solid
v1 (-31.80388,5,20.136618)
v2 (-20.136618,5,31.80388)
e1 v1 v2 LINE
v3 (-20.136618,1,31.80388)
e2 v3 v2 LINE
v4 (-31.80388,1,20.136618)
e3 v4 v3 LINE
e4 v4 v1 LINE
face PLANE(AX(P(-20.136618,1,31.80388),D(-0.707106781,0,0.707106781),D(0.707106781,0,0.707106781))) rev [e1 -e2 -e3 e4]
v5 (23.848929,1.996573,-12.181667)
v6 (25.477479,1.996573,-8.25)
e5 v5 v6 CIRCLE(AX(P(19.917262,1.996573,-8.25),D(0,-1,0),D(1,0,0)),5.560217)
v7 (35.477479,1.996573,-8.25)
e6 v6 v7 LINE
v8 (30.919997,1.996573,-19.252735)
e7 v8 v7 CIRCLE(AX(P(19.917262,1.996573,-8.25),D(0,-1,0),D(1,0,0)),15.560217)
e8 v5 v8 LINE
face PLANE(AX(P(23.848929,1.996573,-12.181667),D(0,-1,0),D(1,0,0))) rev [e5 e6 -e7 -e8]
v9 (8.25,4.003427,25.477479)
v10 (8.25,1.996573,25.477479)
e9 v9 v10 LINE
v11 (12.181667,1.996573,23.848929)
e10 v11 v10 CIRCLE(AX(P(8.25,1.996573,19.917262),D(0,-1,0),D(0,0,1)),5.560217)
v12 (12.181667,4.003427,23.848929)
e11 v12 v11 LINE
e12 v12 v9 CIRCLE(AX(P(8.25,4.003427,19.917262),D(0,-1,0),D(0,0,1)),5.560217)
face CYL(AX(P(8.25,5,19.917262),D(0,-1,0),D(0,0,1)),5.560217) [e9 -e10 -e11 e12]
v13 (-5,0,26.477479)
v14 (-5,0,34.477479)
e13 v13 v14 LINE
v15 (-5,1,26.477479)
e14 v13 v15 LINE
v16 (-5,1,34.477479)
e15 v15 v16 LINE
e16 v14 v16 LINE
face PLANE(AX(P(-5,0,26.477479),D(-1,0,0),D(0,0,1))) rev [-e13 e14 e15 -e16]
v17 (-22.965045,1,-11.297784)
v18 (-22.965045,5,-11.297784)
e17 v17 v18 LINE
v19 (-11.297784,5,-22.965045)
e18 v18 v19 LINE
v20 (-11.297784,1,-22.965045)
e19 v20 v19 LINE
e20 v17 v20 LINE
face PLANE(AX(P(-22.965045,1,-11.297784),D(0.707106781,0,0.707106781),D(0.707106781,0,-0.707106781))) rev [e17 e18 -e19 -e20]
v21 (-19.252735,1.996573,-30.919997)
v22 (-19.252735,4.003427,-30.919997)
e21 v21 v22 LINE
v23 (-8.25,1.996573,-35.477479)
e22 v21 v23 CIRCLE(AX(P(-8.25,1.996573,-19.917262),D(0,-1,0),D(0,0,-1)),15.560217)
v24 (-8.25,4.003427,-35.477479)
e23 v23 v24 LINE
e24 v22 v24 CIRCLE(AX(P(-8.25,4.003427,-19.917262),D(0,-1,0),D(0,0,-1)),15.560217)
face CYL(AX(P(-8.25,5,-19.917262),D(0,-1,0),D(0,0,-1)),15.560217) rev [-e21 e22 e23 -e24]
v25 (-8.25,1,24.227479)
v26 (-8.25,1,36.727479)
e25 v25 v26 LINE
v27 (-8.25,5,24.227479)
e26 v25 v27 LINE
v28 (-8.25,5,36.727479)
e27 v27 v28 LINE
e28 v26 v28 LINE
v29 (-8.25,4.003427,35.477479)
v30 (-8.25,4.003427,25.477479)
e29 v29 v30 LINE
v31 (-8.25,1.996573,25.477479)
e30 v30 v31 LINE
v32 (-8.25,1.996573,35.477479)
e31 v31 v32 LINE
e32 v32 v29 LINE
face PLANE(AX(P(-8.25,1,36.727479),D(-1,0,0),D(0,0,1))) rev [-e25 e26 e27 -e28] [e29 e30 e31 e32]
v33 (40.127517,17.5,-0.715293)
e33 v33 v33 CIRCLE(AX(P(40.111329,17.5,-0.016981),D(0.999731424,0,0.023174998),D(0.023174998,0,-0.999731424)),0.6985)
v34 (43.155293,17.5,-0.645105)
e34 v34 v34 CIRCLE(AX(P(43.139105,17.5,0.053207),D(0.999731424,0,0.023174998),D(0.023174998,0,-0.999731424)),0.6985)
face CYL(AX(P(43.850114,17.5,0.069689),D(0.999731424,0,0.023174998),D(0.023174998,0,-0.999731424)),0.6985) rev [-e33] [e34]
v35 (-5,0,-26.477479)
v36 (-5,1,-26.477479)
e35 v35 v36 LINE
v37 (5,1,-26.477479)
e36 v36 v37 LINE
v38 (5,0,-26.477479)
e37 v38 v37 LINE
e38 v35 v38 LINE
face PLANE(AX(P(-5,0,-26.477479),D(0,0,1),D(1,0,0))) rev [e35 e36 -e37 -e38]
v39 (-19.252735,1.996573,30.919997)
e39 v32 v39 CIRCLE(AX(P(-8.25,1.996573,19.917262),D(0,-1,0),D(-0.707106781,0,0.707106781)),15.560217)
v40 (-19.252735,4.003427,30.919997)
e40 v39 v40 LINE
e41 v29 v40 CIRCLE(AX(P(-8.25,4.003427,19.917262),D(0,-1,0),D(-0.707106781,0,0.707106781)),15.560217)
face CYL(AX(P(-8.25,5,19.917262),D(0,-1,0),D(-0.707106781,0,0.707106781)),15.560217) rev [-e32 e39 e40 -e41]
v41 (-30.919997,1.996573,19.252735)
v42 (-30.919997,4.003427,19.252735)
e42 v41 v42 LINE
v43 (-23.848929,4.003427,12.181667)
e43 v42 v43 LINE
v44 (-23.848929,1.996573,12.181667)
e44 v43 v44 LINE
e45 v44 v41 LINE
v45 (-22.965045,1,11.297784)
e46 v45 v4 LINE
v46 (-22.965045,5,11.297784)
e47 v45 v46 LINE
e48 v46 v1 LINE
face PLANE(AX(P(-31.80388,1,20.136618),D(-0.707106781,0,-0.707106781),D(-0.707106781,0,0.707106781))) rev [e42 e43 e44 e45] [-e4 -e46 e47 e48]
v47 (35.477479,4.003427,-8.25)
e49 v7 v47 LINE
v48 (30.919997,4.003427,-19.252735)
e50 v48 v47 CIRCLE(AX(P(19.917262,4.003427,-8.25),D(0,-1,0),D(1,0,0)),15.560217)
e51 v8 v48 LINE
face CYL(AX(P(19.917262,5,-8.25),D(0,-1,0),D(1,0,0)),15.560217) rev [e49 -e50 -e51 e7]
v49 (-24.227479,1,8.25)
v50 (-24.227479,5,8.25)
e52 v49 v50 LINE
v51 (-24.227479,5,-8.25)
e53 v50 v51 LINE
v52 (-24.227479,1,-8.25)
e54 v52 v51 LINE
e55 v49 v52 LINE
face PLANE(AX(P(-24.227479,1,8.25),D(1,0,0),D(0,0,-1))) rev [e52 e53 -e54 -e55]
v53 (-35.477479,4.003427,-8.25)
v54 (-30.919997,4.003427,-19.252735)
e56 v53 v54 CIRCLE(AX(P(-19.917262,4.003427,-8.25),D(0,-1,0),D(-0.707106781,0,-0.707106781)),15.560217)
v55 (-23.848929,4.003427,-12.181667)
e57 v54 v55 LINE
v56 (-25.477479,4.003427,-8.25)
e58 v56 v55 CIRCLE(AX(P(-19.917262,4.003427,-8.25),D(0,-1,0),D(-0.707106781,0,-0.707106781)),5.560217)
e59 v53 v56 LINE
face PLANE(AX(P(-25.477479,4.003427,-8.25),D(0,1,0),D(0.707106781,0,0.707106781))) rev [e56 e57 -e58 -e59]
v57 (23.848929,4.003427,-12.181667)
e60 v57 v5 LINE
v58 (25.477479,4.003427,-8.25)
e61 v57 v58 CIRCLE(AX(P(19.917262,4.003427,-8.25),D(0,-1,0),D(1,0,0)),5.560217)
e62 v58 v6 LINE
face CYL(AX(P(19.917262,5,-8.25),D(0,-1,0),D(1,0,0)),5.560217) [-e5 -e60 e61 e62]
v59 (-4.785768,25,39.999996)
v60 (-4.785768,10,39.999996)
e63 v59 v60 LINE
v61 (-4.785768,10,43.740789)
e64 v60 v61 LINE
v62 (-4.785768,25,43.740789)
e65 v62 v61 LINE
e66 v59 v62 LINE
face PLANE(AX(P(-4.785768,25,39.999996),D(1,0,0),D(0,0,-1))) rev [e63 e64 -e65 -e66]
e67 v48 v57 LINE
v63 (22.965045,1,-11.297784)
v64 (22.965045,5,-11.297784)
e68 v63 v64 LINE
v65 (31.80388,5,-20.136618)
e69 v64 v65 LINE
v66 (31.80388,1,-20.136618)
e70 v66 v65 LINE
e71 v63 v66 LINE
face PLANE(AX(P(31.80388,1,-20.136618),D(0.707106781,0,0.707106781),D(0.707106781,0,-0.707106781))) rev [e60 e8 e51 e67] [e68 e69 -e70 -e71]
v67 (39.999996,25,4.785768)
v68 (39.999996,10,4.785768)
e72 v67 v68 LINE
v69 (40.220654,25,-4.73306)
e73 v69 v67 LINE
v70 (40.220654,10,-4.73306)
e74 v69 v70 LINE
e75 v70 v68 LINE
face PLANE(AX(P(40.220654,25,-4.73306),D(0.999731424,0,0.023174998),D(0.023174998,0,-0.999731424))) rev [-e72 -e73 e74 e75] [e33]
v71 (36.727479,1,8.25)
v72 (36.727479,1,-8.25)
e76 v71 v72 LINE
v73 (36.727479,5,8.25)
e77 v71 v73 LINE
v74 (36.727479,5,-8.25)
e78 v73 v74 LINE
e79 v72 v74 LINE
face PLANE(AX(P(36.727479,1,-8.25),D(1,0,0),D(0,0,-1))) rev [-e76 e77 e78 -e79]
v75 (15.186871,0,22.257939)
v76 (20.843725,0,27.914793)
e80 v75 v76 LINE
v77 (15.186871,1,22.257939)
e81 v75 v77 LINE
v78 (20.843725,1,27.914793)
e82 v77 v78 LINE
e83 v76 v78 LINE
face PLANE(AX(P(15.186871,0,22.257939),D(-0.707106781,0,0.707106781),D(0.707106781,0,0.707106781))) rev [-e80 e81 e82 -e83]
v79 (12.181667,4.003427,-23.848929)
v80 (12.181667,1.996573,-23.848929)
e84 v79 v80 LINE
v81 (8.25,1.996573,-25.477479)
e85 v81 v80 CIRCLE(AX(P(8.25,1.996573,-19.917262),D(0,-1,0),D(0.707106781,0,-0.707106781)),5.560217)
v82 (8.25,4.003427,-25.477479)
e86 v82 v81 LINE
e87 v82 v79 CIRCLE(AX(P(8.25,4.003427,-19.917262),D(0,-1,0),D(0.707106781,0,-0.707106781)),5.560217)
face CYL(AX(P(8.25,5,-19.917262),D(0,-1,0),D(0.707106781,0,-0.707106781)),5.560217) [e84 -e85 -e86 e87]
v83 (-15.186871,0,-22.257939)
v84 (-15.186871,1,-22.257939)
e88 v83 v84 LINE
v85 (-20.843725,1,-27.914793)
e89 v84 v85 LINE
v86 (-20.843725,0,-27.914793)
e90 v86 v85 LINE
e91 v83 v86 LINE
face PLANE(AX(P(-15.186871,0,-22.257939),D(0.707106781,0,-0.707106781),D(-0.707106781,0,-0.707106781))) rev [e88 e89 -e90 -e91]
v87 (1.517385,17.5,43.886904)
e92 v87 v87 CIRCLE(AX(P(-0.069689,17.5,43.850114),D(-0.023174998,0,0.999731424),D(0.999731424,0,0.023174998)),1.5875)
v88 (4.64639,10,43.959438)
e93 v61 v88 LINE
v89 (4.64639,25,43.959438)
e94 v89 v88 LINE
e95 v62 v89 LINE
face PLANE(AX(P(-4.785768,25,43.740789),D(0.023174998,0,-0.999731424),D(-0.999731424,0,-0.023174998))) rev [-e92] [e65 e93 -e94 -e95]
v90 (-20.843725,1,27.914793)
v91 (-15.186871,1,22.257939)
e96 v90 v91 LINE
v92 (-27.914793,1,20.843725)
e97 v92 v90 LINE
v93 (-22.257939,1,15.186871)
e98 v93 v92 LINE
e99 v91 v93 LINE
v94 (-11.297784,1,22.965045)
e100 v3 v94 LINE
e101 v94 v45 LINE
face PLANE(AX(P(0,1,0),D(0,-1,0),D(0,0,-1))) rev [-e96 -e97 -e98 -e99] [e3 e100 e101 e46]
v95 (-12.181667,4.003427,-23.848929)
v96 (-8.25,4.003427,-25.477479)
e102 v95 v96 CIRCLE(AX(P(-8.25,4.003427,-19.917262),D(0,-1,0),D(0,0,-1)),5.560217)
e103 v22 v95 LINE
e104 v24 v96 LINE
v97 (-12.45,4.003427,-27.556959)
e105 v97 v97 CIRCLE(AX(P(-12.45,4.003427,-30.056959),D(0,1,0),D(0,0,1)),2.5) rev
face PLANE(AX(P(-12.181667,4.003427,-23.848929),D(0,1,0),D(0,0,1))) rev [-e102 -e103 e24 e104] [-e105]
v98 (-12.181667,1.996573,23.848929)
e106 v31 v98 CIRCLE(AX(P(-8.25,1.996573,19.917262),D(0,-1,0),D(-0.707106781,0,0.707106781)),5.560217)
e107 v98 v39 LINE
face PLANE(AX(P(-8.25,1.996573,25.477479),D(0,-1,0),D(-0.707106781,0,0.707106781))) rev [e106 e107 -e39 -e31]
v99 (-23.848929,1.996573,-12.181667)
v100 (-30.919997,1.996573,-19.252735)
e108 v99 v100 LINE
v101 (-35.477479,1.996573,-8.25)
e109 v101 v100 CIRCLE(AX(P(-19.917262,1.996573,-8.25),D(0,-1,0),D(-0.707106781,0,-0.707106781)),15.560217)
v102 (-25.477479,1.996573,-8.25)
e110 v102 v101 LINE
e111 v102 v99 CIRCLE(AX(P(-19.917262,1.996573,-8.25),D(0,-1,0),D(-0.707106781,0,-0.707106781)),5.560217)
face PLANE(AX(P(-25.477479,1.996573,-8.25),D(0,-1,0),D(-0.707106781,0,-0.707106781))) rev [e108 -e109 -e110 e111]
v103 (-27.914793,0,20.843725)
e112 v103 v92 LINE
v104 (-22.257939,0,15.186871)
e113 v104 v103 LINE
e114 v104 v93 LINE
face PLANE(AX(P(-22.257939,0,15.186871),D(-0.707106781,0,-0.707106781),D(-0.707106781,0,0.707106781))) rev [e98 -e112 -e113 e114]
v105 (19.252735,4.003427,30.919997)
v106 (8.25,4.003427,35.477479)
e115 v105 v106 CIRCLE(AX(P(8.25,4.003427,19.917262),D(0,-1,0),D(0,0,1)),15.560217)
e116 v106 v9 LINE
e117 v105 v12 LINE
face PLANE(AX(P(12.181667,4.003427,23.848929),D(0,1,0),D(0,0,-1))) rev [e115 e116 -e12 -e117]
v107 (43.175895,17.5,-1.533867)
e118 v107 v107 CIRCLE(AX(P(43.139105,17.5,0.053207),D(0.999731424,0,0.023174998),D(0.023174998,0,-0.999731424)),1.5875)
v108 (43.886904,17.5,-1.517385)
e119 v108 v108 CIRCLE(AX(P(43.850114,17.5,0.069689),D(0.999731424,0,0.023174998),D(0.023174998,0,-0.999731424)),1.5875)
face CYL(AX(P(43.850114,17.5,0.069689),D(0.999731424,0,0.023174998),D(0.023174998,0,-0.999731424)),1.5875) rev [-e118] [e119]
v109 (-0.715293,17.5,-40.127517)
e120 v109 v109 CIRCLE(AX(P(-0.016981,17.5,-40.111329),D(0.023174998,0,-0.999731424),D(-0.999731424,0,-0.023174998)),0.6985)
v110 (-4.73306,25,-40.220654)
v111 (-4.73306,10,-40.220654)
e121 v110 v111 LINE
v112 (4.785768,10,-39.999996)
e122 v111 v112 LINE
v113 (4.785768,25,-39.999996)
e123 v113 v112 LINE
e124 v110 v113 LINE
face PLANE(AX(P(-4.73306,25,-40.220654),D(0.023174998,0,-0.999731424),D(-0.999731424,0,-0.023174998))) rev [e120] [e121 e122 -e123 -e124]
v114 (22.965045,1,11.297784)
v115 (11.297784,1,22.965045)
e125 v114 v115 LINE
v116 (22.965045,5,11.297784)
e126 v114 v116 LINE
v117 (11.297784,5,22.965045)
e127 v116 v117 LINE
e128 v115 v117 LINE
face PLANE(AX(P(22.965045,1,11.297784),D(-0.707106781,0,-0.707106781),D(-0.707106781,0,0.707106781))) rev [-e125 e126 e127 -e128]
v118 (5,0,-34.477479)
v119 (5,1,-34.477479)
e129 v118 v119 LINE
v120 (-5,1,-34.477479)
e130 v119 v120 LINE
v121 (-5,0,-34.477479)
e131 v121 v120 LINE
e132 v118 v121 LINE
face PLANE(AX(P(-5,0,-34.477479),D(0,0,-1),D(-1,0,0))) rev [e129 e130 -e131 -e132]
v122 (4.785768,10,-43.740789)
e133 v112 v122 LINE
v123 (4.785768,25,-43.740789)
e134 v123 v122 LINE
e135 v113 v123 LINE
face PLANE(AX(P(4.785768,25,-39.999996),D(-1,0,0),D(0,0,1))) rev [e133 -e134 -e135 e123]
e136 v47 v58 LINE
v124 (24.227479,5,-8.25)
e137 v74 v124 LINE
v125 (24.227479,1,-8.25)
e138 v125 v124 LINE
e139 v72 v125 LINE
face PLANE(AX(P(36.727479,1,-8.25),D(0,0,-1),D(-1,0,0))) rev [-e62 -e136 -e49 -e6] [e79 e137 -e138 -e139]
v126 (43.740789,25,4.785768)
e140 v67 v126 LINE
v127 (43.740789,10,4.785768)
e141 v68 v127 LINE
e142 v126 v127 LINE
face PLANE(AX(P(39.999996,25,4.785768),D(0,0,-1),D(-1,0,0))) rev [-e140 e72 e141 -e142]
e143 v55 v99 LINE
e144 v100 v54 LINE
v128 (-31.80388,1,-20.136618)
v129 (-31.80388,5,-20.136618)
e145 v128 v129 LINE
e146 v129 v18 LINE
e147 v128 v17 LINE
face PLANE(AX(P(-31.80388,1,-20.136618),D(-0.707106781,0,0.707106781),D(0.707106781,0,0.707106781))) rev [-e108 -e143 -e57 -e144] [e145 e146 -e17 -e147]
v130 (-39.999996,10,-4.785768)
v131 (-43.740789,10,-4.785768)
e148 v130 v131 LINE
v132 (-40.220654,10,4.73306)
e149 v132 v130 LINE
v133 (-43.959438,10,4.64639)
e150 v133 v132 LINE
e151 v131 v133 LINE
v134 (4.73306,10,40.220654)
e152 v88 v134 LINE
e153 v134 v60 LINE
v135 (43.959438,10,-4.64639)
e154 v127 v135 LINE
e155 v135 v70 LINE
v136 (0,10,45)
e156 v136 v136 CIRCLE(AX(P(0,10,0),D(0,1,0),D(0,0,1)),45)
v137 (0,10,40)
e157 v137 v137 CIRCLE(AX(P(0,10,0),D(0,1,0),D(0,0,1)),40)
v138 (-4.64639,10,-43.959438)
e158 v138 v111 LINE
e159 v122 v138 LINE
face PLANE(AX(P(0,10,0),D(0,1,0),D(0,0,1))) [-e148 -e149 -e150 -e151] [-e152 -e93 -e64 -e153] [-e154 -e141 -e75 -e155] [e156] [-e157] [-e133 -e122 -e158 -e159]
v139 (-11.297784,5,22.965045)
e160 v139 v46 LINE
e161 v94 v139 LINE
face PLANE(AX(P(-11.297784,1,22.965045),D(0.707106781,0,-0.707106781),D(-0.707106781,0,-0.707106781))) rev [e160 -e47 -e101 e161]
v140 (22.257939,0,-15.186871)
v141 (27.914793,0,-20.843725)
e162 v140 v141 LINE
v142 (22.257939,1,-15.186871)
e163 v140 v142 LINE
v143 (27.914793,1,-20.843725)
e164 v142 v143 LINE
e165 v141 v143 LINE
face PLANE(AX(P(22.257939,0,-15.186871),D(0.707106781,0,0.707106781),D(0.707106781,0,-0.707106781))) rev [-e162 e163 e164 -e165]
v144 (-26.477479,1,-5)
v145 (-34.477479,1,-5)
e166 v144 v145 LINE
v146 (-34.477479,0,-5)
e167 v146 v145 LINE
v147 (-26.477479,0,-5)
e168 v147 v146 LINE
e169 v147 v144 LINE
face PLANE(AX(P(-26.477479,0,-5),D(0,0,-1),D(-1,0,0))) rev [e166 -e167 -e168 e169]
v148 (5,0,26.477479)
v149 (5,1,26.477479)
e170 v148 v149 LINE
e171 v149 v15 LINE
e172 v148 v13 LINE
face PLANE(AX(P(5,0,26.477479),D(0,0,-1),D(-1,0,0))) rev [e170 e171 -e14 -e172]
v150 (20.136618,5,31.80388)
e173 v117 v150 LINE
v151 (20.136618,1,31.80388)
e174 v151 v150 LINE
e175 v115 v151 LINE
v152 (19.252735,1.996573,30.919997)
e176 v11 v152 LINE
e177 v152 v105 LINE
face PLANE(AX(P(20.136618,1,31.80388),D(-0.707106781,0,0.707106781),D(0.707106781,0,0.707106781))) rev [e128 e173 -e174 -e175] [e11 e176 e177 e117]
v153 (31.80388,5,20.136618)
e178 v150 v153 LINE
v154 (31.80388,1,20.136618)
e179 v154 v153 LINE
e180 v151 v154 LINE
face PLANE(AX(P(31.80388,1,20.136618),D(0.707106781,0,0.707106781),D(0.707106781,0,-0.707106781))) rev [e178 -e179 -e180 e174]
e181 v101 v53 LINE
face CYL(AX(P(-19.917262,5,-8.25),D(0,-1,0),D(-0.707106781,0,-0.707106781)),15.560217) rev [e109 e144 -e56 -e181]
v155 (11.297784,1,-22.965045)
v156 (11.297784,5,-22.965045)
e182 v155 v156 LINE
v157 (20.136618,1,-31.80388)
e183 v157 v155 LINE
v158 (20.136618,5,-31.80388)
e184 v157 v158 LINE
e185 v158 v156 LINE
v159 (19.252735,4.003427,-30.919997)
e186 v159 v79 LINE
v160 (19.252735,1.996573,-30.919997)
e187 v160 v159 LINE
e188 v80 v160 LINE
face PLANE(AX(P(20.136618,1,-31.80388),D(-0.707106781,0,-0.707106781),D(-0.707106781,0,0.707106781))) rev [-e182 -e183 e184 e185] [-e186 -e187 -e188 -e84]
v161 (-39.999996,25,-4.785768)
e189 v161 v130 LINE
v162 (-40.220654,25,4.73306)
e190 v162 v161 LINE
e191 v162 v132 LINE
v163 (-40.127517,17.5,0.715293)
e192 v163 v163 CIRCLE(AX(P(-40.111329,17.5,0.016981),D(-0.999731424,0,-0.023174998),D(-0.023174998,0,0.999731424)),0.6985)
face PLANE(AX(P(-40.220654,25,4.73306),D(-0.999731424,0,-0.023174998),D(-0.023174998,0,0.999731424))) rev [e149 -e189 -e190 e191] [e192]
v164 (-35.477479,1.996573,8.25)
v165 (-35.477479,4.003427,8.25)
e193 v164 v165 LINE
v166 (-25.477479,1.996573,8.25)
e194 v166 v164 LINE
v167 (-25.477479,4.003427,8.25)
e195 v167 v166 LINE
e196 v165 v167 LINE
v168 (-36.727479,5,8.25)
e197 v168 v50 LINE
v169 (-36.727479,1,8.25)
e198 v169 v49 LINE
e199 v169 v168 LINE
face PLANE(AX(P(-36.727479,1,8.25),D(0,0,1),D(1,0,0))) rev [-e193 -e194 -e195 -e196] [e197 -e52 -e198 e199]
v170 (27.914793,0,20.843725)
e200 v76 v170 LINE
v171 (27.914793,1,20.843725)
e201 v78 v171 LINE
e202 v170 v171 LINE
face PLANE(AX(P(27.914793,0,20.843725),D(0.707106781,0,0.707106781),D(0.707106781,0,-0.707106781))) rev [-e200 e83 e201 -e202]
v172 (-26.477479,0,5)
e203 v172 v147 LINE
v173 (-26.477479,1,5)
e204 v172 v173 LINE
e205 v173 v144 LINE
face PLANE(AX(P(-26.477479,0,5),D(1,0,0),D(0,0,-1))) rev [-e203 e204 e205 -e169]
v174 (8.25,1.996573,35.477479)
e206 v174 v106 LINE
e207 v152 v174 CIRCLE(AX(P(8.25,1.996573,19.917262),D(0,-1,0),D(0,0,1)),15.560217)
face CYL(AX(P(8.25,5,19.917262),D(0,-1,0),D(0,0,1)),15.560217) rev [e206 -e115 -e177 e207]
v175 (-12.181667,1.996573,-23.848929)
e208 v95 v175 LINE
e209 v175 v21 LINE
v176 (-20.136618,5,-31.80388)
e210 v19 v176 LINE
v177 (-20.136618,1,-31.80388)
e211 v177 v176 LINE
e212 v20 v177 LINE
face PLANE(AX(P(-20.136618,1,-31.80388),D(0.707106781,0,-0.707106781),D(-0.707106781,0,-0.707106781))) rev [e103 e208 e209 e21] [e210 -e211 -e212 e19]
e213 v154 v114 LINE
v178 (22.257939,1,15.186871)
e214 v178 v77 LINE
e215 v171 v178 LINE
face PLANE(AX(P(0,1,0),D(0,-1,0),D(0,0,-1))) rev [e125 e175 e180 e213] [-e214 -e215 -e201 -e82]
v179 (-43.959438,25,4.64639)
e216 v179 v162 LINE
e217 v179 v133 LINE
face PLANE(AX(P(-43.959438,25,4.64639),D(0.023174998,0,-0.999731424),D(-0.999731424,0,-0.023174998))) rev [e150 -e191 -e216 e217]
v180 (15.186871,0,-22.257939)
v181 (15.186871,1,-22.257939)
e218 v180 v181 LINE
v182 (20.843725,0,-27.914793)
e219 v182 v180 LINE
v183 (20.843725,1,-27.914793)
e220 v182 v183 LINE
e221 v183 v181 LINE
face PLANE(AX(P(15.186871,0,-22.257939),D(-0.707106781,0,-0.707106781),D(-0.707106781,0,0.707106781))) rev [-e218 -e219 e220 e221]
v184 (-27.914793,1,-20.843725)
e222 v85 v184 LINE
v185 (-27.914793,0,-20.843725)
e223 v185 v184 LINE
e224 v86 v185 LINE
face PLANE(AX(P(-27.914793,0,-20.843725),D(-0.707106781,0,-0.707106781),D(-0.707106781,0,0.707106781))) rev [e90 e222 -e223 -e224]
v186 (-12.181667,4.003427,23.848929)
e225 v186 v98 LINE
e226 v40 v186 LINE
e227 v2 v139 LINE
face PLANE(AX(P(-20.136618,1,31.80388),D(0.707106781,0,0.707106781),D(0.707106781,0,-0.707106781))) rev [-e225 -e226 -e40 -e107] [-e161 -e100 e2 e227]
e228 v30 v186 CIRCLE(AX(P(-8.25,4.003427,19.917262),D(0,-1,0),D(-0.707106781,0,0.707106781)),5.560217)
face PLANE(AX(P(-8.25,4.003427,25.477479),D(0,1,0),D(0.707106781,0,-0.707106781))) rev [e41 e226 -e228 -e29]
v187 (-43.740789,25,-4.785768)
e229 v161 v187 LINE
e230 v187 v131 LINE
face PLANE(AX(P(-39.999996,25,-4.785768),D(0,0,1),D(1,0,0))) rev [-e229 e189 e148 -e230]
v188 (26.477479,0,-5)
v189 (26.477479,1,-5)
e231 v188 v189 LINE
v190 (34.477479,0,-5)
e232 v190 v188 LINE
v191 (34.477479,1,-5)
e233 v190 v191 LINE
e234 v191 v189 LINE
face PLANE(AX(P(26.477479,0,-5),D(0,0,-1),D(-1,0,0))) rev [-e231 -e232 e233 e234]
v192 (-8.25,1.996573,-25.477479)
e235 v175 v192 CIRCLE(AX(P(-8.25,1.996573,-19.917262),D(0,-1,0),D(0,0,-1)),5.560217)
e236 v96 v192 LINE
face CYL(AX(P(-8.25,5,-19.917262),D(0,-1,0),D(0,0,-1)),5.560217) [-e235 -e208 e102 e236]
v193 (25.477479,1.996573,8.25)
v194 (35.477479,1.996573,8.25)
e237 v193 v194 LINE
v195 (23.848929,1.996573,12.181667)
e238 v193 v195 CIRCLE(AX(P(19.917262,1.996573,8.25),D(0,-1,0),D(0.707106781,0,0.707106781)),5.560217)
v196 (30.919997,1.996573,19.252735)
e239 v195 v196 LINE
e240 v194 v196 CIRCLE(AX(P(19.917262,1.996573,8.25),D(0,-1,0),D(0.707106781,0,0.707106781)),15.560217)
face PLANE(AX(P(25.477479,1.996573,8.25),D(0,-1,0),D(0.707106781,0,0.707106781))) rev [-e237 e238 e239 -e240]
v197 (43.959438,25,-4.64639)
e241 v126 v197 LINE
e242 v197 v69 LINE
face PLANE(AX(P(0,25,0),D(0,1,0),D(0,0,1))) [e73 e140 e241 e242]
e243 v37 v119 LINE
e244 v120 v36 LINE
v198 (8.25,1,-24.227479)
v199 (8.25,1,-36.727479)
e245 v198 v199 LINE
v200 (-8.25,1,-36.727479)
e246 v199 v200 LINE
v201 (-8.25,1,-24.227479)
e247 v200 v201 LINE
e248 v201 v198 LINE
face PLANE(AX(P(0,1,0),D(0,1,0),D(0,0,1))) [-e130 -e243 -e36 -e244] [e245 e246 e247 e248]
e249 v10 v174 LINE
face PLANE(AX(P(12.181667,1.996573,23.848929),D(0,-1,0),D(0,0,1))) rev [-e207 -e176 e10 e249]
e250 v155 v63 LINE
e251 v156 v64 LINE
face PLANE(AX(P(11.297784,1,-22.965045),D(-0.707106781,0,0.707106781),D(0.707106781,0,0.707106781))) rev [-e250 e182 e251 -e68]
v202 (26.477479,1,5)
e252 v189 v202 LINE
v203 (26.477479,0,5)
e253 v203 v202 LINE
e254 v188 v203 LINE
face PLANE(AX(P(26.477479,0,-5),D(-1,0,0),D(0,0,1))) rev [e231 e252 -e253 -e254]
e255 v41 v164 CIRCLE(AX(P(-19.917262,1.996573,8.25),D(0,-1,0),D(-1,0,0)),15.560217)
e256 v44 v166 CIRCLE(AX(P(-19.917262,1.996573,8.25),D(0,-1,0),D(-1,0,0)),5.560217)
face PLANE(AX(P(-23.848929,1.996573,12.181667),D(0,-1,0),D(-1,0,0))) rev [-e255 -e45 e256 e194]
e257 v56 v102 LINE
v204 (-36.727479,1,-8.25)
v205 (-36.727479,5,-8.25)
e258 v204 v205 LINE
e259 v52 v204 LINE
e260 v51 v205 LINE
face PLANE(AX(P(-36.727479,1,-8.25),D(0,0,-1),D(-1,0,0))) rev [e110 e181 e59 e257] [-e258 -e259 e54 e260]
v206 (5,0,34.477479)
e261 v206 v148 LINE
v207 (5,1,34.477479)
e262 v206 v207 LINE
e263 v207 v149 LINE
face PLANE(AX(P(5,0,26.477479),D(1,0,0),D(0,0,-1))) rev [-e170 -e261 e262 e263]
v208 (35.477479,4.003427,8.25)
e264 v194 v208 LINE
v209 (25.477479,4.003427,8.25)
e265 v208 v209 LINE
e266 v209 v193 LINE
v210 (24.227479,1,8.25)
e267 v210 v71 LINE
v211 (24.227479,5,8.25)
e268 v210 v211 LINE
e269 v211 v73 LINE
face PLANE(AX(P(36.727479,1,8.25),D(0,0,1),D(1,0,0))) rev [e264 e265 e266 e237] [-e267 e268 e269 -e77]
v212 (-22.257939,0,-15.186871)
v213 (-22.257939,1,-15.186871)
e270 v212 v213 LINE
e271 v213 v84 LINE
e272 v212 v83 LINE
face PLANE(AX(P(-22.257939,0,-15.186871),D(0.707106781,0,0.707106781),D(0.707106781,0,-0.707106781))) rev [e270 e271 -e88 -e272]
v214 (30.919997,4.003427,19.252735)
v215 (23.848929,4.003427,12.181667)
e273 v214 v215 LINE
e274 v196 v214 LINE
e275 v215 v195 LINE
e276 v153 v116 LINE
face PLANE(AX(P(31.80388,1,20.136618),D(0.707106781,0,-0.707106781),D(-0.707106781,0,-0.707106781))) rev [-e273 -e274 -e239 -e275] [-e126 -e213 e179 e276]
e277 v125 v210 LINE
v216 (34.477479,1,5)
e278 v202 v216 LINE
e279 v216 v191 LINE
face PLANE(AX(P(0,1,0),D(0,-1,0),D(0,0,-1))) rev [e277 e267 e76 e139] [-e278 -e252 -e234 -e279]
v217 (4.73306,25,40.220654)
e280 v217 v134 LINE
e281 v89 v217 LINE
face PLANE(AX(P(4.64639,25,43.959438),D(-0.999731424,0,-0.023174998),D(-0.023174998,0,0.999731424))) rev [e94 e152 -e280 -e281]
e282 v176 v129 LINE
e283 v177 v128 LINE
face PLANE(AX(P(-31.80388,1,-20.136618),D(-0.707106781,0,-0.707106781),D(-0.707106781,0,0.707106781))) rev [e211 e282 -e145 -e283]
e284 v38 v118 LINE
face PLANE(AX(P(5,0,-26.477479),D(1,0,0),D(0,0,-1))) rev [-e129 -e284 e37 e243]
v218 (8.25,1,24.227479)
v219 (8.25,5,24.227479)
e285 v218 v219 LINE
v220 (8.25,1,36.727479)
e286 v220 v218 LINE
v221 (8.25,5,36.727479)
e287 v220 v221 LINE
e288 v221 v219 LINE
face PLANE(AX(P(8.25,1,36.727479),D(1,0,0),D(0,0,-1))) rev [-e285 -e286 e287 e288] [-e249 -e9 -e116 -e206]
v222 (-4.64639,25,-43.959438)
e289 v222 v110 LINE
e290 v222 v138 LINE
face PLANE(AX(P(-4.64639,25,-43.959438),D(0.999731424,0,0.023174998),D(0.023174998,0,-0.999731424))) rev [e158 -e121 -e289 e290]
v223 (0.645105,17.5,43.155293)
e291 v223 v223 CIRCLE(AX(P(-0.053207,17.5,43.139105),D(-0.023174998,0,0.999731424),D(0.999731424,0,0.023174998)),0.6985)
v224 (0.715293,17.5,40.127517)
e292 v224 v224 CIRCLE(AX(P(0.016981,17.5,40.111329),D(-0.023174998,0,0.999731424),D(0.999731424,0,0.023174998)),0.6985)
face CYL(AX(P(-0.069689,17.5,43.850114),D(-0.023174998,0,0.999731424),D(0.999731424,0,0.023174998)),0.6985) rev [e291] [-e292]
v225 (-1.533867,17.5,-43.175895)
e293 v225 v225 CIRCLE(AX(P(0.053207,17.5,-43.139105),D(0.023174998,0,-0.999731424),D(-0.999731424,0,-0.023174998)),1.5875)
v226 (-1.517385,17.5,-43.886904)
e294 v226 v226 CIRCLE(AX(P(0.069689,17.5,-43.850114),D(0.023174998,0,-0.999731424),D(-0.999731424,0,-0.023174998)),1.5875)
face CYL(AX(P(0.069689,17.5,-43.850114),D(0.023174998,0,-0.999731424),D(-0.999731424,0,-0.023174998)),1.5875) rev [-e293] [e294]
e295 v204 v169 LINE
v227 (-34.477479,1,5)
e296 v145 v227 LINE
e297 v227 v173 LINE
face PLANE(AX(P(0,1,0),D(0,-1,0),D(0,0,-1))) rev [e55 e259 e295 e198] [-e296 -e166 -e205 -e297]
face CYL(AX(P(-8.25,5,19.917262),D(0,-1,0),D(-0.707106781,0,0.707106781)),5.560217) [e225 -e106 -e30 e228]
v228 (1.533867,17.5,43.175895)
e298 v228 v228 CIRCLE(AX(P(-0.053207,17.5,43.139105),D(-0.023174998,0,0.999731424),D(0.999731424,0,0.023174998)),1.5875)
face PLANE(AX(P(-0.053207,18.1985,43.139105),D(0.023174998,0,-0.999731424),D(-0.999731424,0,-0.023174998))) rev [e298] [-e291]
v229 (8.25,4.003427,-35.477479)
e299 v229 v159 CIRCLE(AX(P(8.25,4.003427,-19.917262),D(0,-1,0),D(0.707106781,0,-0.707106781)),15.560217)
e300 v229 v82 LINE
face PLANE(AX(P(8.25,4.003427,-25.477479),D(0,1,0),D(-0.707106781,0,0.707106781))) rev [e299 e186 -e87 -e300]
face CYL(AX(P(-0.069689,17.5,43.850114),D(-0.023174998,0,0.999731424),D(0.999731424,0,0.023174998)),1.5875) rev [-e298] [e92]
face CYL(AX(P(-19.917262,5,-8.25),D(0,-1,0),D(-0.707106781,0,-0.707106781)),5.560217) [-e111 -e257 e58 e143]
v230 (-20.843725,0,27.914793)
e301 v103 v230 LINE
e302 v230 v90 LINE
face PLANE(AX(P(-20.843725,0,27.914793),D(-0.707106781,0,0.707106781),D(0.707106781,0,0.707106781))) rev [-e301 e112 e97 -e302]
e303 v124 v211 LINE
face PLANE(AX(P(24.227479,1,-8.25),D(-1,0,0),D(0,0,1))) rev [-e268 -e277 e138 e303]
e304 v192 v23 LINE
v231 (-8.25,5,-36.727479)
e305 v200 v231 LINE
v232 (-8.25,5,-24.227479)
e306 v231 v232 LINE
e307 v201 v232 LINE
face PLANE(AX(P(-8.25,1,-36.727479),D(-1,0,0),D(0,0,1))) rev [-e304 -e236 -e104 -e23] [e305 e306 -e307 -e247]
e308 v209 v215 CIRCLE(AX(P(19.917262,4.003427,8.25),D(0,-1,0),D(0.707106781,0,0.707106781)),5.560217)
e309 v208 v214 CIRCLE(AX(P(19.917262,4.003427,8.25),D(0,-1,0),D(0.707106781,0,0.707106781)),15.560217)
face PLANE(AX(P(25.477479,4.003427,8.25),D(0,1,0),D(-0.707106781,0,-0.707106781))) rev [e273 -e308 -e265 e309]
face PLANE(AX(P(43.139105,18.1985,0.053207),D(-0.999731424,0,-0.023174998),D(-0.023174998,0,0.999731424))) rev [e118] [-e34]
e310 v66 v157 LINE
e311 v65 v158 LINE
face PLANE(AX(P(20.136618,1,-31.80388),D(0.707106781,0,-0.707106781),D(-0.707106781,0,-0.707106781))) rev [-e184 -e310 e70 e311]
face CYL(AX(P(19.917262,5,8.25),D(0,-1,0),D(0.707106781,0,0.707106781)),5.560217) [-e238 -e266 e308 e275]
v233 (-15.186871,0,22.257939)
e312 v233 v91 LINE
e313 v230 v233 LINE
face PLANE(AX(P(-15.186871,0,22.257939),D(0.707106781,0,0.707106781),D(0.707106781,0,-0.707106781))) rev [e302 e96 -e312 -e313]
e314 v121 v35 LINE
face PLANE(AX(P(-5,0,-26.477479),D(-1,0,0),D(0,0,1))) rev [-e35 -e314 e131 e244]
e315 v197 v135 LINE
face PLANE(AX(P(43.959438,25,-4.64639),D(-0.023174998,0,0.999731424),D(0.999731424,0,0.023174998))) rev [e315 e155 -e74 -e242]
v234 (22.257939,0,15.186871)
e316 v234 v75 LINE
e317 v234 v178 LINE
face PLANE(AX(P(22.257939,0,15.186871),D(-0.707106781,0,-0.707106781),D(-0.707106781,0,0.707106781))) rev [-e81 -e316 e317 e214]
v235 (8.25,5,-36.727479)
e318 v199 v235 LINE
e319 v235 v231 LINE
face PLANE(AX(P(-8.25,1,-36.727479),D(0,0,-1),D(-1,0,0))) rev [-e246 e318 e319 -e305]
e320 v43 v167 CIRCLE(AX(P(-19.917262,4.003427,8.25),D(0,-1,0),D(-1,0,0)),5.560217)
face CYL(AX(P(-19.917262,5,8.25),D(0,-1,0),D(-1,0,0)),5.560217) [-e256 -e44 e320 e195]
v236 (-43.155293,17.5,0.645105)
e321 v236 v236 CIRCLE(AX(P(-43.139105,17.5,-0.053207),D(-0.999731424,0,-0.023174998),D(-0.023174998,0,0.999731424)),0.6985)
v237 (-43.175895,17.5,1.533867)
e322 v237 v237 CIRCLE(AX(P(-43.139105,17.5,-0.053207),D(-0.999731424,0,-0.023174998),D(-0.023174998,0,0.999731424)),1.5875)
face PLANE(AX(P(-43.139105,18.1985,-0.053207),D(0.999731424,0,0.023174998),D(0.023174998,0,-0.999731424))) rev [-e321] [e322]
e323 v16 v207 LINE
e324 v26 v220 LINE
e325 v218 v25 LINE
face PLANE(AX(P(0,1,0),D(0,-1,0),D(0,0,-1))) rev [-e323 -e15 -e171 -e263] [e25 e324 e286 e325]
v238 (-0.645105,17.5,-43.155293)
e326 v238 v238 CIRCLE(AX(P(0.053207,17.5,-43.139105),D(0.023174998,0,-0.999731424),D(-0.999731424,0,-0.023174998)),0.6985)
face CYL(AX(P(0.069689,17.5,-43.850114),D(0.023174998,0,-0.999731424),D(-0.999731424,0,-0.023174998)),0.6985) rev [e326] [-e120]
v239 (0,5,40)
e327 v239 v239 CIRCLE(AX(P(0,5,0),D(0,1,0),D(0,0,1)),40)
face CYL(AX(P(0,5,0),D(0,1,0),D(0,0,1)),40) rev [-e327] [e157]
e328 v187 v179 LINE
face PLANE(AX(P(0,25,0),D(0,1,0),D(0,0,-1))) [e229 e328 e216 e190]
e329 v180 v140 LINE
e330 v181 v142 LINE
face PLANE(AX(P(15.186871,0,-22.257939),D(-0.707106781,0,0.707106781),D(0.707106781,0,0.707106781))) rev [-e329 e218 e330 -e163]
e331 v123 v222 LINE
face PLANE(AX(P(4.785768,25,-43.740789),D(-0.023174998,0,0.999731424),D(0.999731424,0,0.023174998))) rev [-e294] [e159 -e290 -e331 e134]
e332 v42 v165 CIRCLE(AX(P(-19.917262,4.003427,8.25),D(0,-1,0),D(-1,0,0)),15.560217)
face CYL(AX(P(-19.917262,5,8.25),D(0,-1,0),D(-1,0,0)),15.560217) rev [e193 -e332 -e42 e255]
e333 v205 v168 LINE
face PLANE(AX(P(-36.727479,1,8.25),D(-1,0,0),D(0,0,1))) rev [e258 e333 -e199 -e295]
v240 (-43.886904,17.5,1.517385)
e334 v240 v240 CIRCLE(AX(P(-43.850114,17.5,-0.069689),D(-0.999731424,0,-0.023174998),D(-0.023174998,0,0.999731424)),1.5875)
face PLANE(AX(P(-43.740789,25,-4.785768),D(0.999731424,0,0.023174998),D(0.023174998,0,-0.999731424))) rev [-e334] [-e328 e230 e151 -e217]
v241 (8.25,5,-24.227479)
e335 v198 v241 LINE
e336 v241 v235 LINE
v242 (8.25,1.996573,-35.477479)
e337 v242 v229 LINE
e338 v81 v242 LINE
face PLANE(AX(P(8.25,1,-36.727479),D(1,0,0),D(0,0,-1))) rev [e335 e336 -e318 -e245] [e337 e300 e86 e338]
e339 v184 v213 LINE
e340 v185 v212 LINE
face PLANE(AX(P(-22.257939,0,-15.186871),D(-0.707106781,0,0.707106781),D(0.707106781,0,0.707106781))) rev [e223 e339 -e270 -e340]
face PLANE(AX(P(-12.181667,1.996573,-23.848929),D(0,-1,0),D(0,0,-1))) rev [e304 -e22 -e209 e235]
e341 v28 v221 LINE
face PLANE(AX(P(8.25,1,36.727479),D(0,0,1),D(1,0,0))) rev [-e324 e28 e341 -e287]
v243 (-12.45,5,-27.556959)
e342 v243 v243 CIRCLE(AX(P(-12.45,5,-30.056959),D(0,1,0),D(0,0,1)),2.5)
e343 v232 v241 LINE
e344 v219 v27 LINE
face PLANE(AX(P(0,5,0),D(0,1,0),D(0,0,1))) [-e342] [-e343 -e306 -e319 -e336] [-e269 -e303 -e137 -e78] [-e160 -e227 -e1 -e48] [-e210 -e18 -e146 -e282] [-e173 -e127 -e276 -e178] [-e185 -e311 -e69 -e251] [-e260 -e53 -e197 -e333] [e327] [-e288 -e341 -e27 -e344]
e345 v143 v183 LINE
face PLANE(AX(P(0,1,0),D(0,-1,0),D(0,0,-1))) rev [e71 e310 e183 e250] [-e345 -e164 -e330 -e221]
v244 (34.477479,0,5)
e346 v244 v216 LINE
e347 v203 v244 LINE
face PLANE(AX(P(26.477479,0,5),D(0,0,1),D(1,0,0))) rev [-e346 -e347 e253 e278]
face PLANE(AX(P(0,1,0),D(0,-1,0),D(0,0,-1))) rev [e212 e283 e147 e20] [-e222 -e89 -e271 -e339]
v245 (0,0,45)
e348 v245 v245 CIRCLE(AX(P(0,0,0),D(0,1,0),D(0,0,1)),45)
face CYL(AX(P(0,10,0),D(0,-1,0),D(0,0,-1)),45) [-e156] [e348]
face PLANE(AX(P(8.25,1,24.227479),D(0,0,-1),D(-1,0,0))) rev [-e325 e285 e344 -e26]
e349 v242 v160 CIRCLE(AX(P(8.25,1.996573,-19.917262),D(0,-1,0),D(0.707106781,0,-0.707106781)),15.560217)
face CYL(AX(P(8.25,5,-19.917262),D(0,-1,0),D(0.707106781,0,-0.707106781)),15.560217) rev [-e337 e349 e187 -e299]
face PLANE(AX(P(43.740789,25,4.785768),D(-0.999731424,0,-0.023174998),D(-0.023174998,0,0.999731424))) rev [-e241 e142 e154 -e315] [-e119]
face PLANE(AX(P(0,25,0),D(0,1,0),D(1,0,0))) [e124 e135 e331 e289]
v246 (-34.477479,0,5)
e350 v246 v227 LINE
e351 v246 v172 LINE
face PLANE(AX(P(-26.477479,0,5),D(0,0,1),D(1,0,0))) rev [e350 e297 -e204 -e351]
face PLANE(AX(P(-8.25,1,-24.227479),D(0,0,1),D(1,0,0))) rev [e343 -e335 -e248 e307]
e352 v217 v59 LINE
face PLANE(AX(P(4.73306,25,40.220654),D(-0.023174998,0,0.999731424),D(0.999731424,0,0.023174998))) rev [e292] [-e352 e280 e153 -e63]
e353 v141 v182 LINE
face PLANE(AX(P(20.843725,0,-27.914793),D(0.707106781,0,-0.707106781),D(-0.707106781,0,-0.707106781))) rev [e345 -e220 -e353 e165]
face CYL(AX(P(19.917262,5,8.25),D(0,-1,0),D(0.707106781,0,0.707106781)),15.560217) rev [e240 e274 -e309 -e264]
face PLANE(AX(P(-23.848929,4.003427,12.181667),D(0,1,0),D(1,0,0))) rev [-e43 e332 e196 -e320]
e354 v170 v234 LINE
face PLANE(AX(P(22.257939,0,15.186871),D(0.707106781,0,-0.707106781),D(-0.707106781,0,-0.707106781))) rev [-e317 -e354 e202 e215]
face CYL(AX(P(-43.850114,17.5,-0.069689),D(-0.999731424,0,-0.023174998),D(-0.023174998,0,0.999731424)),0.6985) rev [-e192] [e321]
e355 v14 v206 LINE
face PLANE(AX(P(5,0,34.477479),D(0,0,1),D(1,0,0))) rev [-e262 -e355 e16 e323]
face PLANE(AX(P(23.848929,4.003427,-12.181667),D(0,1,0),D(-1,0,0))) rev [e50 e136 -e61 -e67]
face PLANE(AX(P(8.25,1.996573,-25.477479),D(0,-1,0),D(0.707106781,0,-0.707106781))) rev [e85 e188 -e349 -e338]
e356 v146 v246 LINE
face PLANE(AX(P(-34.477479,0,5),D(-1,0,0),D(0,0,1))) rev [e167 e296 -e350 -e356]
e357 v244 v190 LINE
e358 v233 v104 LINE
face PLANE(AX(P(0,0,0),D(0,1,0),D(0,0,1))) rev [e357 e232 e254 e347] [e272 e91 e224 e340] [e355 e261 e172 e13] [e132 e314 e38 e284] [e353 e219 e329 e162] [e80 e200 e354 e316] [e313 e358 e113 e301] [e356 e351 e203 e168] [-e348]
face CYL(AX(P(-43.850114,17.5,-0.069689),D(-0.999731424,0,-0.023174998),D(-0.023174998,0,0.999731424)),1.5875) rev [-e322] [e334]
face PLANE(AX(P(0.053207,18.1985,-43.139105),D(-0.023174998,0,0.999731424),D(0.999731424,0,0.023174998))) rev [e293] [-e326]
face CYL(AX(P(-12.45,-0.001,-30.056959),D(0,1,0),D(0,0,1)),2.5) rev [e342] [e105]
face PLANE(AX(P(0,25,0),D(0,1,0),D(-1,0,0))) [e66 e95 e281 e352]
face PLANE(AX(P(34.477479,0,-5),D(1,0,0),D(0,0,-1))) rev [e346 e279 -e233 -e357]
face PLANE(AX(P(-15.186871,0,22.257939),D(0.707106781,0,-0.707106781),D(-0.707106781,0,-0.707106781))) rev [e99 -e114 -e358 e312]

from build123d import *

# Parameters (mm, degrees)
SKETCH2_R                                     = 45
BOSS_EXTRUDE1_DEPTH                           = 10
SKETCH3_R                                     = 40
CUT_EXTRUDE1_DEPTH                            = 5
SKETCH4_W                                     = 16.5
SKETCH4_H                                     = 12.5
SKETCH4_W_2                                   = 12.5
SKETCH4_H_2                                   = 16.5
CUT_EXTRUDE2_DEPTH                            = 4
SKETCH6_W                                     = 10
SKETCH6_H                                     = 8
CUT_EXTRUDE3_DEPTH                            = 65.272855857
CIRPATTERN1_COUNT                             = 8
SKETCH7_W                                     = 10
SKETCH7_H                                     = 2.006854622
CUT_REVOLVE1_ANGLE                            = 45
CIRPATTERN8_COUNT                             = 8
CUT_EXTRUDE4_REACH                            = 65.836
SKETCH10_R                                    = 2.5
BOSS_EXTRUDE2_DEPTH                           = 15
CIRPATTERN9_COUNT                             = 4
CBORE_START                                   = 40.100162841
CBORE_FOR_00_BINDING_HEAD_MACHINE_S_2_R       = 0.6985
CBORE_FOR_00_BINDING_HEAD_MACHINE_SCREW_DEPTH = 3.739789051
CBORE_START_2                                 = 43.128751892
CBORE_FOR_00_BINDING_HEAD_MACHINE_S_3_O_R     = 1.5875
CBORE_FOR_00_BINDING_HEAD_MACHINE_S_3_O_R_2   = 0.6985
CBORE_FOR_00_BINDING_HEAD_MACHINE_S_3_DEPTH   = 0.7112
CIRPATTERN10_COUNT                            = 4


# Read off the part's stored shape, not the designer's step: CBORE for #00 Binding Head Machine Screw3
with BuildPart() as part:
    # Sketch2 → Boss-Extrude1 (new body)
    with BuildSketch(Plane(origin=(0, 0, 0), x_dir=(1, 0, 0), z_dir=(0, 1, 0))):
        with Locations(Location((0, 0, 0), (0, 0, 270))):
            Circle(SKETCH2_R)
    extrude(amount=BOSS_EXTRUDE1_DEPTH)

    # Sketch3 → Cut-Extrude1 (cut)
    with BuildSketch(Plane(origin=(0, 10, 0), x_dir=(1, 0, 0), z_dir=(0, 1, 0))):
        with Locations(Location((0, 0, 0), (0, 0, 270))):
            Circle(SKETCH3_R)
    extrude(amount=-CUT_EXTRUDE1_DEPTH, mode=Mode.SUBTRACT)

    # Sketch4 → Cut-Extrude2 (cut)
    with BuildSketch(Plane(origin=(0, 5, 0), x_dir=(1, 0, 0), z_dir=(0, 1, 0))):
        with Locations((0, 30.477478673)):
            Rectangle(SKETCH4_W, SKETCH4_H)
        Polygon((20.136618281, 31.80388017), (11.297783516, 22.965045405), (22.965045405, 11.297783516), (31.80388017, 20.136618281), align=None)
        with Locations((30.477478673, 0)):
            Rectangle(SKETCH4_W_2, SKETCH4_H_2)
        Polygon((31.80388017, -20.136618281), (22.965045405, -11.297783516), (11.297783516, -22.965045405), (20.136618281, -31.80388017), align=None)
        with Locations((0, -30.477478673)):
            Rectangle(SKETCH4_W, SKETCH4_H)
        Polygon((-20.136618281, -31.80388017), (-11.297783516, -22.965045405), (-22.965045405, -11.297783516), (-31.80388017, -20.136618281), align=None)
        with Locations((-30.477478673, 0)):
            Rectangle(SKETCH4_W_2, SKETCH4_H_2)
        Polygon((-31.80388017, 20.136618281), (-22.965045405, 11.297783516), (-11.297783516, 22.965045405), (-20.136618281, 31.80388017), align=None)
    extrude(amount=-CUT_EXTRUDE2_DEPTH, mode=Mode.SUBTRACT)

    # Sketch6 → Cut-Extrude3 (cut, through all)
    with BuildSketch(Plane(origin=(0, 1, 0), x_dir=(1, 0, 0), z_dir=(0, 1, 0))):
        with Locations((0, 30.477478673)):
            Rectangle(SKETCH6_W, SKETCH6_H)
    cut_extrude3 = extrude(amount=-CUT_EXTRUDE3_DEPTH, mode=Mode.SUBTRACT)

    # CirPattern1: Cut-Extrude3 ×8 about axis
    cirpattern1_axis = Axis((0, 0, 0), (0, 1, 0))
    for i in range(1, CIRPATTERN1_COUNT):
        add(cut_extrude3.rotate(cirpattern1_axis, i * 360 / CIRPATTERN1_COUNT), mode=Mode.SUBTRACT)

    # Sketch7 → Cut-Revolve1 (revolve, cut)
    with BuildSketch(Plane(origin=(-8.25, 0, 0), x_dir=(0, 0, -1), z_dir=(1, 0, 0))):
        with Locations((30.477478673, 3)):
            Rectangle(SKETCH7_W, SKETCH7_H)
    cut_revolve1 = revolve(axis=Axis((-8.25, 5, -19.91726189), (0, 1, 0)), revolution_arc=CUT_REVOLVE1_ANGLE, mode=Mode.SUBTRACT)

    # CirPattern8: Cut-Revolve1 ×8 about axis
    cirpattern8_axis = Axis((0, 0, 0), (0, 1, 0))
    for i in range(1, CIRPATTERN8_COUNT):
        add(cut_revolve1.rotate(cirpattern8_axis, i * 360 / CIRPATTERN8_COUNT), mode=Mode.SUBTRACT)

    # Sketch10 → Cut-Extrude4 (cut, up to next)
    with BuildSketch(Plane(origin=(0, 5, 0), x_dir=(1, 0, 0), z_dir=(0, 1, 0)), mode=Mode.PRIVATE) as cut_extrude4_sk1:
        with Locations(Location((-12.45, 30.056958852, 0), (0, 0, 270))):
            Circle(SKETCH10_R)
    cut_extrude4_tool1 = extrude(cut_extrude4_sk1.sketch, amount=-CUT_EXTRUDE4_REACH, mode=Mode.PRIVATE) & part.part
    add(cut_extrude4_tool1.solids().sort_by_distance((-12.45, 5, -30.056959))[0], mode=Mode.SUBTRACT)

    # Sketch11 → Boss-Extrude2 (add)
    with BuildSketch(Plane(origin=(0, 10, 0), x_dir=(1, 0, 0), z_dir=(0, 1, 0))):
        Polygon((40.22065381, 4.733059783), (39.999995725, -4.78576812), (43.740789465, -4.78576812), (43.959438442, 4.646390178), align=None)
    boss_extrude2 = extrude(amount=BOSS_EXTRUDE2_DEPTH)

    # CirPattern9: Boss-Extrude2 ×4 about axis
    cirpattern9_axis = Axis((0, 0, 0), (0, 1, 0))
    for i in range(1, CIRPATTERN9_COUNT):
        add(boss_extrude2.rotate(cirpattern9_axis, i * 360 / CIRPATTERN9_COUNT))

    # CBORE for _00 Binding Head Machine S 2 → CBORE for #00 Binding Head Machine Screw3 (cut)
    with BuildSketch(Plane(origin=(0, 0, 0), x_dir=(0, 1, 0), z_dir=(0.9997314236585955, 0, 0.02317499837233911)).offset(CBORE_START)):
        with Locations((17.5, -0.946556065)):
            Circle(CBORE_FOR_00_BINDING_HEAD_MACHINE_S_2_R)
    cbore_for_00_binding_head_machine_screw = extrude(amount=CBORE_FOR_00_BINDING_HEAD_MACHINE_SCREW_DEPTH, mode=Mode.SUBTRACT)

    # CBORE for _00 Binding Head Machine S 3 o → CBORE for _00 Binding Head Machine S 3 (cut)
    with BuildSketch(Plane(origin=(0, 0, 0), x_dir=(0, 1, 0), z_dir=(0.9997314236585955, 0, 0.02317499837233911)).offset(CBORE_START_2)):
        with Locations((17.5, -0.946556065)):
            Circle(CBORE_FOR_00_BINDING_HEAD_MACHINE_S_3_O_R)
        with Locations((17.5, -0.946556065)):
            Circle(CBORE_FOR_00_BINDING_HEAD_MACHINE_S_3_O_R_2, mode=Mode.SUBTRACT)
    cbore_for_00_binding_head_machine_s_3 = extrude(amount=CBORE_FOR_00_BINDING_HEAD_MACHINE_S_3_DEPTH, mode=Mode.SUBTRACT)

    # CirPattern10: CBORE for #00 Binding Head Machine Screw3, CBORE for _00 Binding Head Machine S 3 ×4 about axis
    cirpattern10_axis = Axis((0, 0, 0), (0, 1, 0))
    add([cbore_for_00_binding_head_machine_screw.rotate(cirpattern10_axis, i * 360 / CIRPATTERN10_COUNT) for i in range(1, CIRPATTERN10_COUNT)], mode=Mode.SUBTRACT)
    add([cbore_for_00_binding_head_machine_s_3.rotate(cirpattern10_axis, i * 360 / CIRPATTERN10_COUNT) for i in range(1, CIRPATTERN10_COUNT)], mode=Mode.SUBTRACT)


solid = part.part
